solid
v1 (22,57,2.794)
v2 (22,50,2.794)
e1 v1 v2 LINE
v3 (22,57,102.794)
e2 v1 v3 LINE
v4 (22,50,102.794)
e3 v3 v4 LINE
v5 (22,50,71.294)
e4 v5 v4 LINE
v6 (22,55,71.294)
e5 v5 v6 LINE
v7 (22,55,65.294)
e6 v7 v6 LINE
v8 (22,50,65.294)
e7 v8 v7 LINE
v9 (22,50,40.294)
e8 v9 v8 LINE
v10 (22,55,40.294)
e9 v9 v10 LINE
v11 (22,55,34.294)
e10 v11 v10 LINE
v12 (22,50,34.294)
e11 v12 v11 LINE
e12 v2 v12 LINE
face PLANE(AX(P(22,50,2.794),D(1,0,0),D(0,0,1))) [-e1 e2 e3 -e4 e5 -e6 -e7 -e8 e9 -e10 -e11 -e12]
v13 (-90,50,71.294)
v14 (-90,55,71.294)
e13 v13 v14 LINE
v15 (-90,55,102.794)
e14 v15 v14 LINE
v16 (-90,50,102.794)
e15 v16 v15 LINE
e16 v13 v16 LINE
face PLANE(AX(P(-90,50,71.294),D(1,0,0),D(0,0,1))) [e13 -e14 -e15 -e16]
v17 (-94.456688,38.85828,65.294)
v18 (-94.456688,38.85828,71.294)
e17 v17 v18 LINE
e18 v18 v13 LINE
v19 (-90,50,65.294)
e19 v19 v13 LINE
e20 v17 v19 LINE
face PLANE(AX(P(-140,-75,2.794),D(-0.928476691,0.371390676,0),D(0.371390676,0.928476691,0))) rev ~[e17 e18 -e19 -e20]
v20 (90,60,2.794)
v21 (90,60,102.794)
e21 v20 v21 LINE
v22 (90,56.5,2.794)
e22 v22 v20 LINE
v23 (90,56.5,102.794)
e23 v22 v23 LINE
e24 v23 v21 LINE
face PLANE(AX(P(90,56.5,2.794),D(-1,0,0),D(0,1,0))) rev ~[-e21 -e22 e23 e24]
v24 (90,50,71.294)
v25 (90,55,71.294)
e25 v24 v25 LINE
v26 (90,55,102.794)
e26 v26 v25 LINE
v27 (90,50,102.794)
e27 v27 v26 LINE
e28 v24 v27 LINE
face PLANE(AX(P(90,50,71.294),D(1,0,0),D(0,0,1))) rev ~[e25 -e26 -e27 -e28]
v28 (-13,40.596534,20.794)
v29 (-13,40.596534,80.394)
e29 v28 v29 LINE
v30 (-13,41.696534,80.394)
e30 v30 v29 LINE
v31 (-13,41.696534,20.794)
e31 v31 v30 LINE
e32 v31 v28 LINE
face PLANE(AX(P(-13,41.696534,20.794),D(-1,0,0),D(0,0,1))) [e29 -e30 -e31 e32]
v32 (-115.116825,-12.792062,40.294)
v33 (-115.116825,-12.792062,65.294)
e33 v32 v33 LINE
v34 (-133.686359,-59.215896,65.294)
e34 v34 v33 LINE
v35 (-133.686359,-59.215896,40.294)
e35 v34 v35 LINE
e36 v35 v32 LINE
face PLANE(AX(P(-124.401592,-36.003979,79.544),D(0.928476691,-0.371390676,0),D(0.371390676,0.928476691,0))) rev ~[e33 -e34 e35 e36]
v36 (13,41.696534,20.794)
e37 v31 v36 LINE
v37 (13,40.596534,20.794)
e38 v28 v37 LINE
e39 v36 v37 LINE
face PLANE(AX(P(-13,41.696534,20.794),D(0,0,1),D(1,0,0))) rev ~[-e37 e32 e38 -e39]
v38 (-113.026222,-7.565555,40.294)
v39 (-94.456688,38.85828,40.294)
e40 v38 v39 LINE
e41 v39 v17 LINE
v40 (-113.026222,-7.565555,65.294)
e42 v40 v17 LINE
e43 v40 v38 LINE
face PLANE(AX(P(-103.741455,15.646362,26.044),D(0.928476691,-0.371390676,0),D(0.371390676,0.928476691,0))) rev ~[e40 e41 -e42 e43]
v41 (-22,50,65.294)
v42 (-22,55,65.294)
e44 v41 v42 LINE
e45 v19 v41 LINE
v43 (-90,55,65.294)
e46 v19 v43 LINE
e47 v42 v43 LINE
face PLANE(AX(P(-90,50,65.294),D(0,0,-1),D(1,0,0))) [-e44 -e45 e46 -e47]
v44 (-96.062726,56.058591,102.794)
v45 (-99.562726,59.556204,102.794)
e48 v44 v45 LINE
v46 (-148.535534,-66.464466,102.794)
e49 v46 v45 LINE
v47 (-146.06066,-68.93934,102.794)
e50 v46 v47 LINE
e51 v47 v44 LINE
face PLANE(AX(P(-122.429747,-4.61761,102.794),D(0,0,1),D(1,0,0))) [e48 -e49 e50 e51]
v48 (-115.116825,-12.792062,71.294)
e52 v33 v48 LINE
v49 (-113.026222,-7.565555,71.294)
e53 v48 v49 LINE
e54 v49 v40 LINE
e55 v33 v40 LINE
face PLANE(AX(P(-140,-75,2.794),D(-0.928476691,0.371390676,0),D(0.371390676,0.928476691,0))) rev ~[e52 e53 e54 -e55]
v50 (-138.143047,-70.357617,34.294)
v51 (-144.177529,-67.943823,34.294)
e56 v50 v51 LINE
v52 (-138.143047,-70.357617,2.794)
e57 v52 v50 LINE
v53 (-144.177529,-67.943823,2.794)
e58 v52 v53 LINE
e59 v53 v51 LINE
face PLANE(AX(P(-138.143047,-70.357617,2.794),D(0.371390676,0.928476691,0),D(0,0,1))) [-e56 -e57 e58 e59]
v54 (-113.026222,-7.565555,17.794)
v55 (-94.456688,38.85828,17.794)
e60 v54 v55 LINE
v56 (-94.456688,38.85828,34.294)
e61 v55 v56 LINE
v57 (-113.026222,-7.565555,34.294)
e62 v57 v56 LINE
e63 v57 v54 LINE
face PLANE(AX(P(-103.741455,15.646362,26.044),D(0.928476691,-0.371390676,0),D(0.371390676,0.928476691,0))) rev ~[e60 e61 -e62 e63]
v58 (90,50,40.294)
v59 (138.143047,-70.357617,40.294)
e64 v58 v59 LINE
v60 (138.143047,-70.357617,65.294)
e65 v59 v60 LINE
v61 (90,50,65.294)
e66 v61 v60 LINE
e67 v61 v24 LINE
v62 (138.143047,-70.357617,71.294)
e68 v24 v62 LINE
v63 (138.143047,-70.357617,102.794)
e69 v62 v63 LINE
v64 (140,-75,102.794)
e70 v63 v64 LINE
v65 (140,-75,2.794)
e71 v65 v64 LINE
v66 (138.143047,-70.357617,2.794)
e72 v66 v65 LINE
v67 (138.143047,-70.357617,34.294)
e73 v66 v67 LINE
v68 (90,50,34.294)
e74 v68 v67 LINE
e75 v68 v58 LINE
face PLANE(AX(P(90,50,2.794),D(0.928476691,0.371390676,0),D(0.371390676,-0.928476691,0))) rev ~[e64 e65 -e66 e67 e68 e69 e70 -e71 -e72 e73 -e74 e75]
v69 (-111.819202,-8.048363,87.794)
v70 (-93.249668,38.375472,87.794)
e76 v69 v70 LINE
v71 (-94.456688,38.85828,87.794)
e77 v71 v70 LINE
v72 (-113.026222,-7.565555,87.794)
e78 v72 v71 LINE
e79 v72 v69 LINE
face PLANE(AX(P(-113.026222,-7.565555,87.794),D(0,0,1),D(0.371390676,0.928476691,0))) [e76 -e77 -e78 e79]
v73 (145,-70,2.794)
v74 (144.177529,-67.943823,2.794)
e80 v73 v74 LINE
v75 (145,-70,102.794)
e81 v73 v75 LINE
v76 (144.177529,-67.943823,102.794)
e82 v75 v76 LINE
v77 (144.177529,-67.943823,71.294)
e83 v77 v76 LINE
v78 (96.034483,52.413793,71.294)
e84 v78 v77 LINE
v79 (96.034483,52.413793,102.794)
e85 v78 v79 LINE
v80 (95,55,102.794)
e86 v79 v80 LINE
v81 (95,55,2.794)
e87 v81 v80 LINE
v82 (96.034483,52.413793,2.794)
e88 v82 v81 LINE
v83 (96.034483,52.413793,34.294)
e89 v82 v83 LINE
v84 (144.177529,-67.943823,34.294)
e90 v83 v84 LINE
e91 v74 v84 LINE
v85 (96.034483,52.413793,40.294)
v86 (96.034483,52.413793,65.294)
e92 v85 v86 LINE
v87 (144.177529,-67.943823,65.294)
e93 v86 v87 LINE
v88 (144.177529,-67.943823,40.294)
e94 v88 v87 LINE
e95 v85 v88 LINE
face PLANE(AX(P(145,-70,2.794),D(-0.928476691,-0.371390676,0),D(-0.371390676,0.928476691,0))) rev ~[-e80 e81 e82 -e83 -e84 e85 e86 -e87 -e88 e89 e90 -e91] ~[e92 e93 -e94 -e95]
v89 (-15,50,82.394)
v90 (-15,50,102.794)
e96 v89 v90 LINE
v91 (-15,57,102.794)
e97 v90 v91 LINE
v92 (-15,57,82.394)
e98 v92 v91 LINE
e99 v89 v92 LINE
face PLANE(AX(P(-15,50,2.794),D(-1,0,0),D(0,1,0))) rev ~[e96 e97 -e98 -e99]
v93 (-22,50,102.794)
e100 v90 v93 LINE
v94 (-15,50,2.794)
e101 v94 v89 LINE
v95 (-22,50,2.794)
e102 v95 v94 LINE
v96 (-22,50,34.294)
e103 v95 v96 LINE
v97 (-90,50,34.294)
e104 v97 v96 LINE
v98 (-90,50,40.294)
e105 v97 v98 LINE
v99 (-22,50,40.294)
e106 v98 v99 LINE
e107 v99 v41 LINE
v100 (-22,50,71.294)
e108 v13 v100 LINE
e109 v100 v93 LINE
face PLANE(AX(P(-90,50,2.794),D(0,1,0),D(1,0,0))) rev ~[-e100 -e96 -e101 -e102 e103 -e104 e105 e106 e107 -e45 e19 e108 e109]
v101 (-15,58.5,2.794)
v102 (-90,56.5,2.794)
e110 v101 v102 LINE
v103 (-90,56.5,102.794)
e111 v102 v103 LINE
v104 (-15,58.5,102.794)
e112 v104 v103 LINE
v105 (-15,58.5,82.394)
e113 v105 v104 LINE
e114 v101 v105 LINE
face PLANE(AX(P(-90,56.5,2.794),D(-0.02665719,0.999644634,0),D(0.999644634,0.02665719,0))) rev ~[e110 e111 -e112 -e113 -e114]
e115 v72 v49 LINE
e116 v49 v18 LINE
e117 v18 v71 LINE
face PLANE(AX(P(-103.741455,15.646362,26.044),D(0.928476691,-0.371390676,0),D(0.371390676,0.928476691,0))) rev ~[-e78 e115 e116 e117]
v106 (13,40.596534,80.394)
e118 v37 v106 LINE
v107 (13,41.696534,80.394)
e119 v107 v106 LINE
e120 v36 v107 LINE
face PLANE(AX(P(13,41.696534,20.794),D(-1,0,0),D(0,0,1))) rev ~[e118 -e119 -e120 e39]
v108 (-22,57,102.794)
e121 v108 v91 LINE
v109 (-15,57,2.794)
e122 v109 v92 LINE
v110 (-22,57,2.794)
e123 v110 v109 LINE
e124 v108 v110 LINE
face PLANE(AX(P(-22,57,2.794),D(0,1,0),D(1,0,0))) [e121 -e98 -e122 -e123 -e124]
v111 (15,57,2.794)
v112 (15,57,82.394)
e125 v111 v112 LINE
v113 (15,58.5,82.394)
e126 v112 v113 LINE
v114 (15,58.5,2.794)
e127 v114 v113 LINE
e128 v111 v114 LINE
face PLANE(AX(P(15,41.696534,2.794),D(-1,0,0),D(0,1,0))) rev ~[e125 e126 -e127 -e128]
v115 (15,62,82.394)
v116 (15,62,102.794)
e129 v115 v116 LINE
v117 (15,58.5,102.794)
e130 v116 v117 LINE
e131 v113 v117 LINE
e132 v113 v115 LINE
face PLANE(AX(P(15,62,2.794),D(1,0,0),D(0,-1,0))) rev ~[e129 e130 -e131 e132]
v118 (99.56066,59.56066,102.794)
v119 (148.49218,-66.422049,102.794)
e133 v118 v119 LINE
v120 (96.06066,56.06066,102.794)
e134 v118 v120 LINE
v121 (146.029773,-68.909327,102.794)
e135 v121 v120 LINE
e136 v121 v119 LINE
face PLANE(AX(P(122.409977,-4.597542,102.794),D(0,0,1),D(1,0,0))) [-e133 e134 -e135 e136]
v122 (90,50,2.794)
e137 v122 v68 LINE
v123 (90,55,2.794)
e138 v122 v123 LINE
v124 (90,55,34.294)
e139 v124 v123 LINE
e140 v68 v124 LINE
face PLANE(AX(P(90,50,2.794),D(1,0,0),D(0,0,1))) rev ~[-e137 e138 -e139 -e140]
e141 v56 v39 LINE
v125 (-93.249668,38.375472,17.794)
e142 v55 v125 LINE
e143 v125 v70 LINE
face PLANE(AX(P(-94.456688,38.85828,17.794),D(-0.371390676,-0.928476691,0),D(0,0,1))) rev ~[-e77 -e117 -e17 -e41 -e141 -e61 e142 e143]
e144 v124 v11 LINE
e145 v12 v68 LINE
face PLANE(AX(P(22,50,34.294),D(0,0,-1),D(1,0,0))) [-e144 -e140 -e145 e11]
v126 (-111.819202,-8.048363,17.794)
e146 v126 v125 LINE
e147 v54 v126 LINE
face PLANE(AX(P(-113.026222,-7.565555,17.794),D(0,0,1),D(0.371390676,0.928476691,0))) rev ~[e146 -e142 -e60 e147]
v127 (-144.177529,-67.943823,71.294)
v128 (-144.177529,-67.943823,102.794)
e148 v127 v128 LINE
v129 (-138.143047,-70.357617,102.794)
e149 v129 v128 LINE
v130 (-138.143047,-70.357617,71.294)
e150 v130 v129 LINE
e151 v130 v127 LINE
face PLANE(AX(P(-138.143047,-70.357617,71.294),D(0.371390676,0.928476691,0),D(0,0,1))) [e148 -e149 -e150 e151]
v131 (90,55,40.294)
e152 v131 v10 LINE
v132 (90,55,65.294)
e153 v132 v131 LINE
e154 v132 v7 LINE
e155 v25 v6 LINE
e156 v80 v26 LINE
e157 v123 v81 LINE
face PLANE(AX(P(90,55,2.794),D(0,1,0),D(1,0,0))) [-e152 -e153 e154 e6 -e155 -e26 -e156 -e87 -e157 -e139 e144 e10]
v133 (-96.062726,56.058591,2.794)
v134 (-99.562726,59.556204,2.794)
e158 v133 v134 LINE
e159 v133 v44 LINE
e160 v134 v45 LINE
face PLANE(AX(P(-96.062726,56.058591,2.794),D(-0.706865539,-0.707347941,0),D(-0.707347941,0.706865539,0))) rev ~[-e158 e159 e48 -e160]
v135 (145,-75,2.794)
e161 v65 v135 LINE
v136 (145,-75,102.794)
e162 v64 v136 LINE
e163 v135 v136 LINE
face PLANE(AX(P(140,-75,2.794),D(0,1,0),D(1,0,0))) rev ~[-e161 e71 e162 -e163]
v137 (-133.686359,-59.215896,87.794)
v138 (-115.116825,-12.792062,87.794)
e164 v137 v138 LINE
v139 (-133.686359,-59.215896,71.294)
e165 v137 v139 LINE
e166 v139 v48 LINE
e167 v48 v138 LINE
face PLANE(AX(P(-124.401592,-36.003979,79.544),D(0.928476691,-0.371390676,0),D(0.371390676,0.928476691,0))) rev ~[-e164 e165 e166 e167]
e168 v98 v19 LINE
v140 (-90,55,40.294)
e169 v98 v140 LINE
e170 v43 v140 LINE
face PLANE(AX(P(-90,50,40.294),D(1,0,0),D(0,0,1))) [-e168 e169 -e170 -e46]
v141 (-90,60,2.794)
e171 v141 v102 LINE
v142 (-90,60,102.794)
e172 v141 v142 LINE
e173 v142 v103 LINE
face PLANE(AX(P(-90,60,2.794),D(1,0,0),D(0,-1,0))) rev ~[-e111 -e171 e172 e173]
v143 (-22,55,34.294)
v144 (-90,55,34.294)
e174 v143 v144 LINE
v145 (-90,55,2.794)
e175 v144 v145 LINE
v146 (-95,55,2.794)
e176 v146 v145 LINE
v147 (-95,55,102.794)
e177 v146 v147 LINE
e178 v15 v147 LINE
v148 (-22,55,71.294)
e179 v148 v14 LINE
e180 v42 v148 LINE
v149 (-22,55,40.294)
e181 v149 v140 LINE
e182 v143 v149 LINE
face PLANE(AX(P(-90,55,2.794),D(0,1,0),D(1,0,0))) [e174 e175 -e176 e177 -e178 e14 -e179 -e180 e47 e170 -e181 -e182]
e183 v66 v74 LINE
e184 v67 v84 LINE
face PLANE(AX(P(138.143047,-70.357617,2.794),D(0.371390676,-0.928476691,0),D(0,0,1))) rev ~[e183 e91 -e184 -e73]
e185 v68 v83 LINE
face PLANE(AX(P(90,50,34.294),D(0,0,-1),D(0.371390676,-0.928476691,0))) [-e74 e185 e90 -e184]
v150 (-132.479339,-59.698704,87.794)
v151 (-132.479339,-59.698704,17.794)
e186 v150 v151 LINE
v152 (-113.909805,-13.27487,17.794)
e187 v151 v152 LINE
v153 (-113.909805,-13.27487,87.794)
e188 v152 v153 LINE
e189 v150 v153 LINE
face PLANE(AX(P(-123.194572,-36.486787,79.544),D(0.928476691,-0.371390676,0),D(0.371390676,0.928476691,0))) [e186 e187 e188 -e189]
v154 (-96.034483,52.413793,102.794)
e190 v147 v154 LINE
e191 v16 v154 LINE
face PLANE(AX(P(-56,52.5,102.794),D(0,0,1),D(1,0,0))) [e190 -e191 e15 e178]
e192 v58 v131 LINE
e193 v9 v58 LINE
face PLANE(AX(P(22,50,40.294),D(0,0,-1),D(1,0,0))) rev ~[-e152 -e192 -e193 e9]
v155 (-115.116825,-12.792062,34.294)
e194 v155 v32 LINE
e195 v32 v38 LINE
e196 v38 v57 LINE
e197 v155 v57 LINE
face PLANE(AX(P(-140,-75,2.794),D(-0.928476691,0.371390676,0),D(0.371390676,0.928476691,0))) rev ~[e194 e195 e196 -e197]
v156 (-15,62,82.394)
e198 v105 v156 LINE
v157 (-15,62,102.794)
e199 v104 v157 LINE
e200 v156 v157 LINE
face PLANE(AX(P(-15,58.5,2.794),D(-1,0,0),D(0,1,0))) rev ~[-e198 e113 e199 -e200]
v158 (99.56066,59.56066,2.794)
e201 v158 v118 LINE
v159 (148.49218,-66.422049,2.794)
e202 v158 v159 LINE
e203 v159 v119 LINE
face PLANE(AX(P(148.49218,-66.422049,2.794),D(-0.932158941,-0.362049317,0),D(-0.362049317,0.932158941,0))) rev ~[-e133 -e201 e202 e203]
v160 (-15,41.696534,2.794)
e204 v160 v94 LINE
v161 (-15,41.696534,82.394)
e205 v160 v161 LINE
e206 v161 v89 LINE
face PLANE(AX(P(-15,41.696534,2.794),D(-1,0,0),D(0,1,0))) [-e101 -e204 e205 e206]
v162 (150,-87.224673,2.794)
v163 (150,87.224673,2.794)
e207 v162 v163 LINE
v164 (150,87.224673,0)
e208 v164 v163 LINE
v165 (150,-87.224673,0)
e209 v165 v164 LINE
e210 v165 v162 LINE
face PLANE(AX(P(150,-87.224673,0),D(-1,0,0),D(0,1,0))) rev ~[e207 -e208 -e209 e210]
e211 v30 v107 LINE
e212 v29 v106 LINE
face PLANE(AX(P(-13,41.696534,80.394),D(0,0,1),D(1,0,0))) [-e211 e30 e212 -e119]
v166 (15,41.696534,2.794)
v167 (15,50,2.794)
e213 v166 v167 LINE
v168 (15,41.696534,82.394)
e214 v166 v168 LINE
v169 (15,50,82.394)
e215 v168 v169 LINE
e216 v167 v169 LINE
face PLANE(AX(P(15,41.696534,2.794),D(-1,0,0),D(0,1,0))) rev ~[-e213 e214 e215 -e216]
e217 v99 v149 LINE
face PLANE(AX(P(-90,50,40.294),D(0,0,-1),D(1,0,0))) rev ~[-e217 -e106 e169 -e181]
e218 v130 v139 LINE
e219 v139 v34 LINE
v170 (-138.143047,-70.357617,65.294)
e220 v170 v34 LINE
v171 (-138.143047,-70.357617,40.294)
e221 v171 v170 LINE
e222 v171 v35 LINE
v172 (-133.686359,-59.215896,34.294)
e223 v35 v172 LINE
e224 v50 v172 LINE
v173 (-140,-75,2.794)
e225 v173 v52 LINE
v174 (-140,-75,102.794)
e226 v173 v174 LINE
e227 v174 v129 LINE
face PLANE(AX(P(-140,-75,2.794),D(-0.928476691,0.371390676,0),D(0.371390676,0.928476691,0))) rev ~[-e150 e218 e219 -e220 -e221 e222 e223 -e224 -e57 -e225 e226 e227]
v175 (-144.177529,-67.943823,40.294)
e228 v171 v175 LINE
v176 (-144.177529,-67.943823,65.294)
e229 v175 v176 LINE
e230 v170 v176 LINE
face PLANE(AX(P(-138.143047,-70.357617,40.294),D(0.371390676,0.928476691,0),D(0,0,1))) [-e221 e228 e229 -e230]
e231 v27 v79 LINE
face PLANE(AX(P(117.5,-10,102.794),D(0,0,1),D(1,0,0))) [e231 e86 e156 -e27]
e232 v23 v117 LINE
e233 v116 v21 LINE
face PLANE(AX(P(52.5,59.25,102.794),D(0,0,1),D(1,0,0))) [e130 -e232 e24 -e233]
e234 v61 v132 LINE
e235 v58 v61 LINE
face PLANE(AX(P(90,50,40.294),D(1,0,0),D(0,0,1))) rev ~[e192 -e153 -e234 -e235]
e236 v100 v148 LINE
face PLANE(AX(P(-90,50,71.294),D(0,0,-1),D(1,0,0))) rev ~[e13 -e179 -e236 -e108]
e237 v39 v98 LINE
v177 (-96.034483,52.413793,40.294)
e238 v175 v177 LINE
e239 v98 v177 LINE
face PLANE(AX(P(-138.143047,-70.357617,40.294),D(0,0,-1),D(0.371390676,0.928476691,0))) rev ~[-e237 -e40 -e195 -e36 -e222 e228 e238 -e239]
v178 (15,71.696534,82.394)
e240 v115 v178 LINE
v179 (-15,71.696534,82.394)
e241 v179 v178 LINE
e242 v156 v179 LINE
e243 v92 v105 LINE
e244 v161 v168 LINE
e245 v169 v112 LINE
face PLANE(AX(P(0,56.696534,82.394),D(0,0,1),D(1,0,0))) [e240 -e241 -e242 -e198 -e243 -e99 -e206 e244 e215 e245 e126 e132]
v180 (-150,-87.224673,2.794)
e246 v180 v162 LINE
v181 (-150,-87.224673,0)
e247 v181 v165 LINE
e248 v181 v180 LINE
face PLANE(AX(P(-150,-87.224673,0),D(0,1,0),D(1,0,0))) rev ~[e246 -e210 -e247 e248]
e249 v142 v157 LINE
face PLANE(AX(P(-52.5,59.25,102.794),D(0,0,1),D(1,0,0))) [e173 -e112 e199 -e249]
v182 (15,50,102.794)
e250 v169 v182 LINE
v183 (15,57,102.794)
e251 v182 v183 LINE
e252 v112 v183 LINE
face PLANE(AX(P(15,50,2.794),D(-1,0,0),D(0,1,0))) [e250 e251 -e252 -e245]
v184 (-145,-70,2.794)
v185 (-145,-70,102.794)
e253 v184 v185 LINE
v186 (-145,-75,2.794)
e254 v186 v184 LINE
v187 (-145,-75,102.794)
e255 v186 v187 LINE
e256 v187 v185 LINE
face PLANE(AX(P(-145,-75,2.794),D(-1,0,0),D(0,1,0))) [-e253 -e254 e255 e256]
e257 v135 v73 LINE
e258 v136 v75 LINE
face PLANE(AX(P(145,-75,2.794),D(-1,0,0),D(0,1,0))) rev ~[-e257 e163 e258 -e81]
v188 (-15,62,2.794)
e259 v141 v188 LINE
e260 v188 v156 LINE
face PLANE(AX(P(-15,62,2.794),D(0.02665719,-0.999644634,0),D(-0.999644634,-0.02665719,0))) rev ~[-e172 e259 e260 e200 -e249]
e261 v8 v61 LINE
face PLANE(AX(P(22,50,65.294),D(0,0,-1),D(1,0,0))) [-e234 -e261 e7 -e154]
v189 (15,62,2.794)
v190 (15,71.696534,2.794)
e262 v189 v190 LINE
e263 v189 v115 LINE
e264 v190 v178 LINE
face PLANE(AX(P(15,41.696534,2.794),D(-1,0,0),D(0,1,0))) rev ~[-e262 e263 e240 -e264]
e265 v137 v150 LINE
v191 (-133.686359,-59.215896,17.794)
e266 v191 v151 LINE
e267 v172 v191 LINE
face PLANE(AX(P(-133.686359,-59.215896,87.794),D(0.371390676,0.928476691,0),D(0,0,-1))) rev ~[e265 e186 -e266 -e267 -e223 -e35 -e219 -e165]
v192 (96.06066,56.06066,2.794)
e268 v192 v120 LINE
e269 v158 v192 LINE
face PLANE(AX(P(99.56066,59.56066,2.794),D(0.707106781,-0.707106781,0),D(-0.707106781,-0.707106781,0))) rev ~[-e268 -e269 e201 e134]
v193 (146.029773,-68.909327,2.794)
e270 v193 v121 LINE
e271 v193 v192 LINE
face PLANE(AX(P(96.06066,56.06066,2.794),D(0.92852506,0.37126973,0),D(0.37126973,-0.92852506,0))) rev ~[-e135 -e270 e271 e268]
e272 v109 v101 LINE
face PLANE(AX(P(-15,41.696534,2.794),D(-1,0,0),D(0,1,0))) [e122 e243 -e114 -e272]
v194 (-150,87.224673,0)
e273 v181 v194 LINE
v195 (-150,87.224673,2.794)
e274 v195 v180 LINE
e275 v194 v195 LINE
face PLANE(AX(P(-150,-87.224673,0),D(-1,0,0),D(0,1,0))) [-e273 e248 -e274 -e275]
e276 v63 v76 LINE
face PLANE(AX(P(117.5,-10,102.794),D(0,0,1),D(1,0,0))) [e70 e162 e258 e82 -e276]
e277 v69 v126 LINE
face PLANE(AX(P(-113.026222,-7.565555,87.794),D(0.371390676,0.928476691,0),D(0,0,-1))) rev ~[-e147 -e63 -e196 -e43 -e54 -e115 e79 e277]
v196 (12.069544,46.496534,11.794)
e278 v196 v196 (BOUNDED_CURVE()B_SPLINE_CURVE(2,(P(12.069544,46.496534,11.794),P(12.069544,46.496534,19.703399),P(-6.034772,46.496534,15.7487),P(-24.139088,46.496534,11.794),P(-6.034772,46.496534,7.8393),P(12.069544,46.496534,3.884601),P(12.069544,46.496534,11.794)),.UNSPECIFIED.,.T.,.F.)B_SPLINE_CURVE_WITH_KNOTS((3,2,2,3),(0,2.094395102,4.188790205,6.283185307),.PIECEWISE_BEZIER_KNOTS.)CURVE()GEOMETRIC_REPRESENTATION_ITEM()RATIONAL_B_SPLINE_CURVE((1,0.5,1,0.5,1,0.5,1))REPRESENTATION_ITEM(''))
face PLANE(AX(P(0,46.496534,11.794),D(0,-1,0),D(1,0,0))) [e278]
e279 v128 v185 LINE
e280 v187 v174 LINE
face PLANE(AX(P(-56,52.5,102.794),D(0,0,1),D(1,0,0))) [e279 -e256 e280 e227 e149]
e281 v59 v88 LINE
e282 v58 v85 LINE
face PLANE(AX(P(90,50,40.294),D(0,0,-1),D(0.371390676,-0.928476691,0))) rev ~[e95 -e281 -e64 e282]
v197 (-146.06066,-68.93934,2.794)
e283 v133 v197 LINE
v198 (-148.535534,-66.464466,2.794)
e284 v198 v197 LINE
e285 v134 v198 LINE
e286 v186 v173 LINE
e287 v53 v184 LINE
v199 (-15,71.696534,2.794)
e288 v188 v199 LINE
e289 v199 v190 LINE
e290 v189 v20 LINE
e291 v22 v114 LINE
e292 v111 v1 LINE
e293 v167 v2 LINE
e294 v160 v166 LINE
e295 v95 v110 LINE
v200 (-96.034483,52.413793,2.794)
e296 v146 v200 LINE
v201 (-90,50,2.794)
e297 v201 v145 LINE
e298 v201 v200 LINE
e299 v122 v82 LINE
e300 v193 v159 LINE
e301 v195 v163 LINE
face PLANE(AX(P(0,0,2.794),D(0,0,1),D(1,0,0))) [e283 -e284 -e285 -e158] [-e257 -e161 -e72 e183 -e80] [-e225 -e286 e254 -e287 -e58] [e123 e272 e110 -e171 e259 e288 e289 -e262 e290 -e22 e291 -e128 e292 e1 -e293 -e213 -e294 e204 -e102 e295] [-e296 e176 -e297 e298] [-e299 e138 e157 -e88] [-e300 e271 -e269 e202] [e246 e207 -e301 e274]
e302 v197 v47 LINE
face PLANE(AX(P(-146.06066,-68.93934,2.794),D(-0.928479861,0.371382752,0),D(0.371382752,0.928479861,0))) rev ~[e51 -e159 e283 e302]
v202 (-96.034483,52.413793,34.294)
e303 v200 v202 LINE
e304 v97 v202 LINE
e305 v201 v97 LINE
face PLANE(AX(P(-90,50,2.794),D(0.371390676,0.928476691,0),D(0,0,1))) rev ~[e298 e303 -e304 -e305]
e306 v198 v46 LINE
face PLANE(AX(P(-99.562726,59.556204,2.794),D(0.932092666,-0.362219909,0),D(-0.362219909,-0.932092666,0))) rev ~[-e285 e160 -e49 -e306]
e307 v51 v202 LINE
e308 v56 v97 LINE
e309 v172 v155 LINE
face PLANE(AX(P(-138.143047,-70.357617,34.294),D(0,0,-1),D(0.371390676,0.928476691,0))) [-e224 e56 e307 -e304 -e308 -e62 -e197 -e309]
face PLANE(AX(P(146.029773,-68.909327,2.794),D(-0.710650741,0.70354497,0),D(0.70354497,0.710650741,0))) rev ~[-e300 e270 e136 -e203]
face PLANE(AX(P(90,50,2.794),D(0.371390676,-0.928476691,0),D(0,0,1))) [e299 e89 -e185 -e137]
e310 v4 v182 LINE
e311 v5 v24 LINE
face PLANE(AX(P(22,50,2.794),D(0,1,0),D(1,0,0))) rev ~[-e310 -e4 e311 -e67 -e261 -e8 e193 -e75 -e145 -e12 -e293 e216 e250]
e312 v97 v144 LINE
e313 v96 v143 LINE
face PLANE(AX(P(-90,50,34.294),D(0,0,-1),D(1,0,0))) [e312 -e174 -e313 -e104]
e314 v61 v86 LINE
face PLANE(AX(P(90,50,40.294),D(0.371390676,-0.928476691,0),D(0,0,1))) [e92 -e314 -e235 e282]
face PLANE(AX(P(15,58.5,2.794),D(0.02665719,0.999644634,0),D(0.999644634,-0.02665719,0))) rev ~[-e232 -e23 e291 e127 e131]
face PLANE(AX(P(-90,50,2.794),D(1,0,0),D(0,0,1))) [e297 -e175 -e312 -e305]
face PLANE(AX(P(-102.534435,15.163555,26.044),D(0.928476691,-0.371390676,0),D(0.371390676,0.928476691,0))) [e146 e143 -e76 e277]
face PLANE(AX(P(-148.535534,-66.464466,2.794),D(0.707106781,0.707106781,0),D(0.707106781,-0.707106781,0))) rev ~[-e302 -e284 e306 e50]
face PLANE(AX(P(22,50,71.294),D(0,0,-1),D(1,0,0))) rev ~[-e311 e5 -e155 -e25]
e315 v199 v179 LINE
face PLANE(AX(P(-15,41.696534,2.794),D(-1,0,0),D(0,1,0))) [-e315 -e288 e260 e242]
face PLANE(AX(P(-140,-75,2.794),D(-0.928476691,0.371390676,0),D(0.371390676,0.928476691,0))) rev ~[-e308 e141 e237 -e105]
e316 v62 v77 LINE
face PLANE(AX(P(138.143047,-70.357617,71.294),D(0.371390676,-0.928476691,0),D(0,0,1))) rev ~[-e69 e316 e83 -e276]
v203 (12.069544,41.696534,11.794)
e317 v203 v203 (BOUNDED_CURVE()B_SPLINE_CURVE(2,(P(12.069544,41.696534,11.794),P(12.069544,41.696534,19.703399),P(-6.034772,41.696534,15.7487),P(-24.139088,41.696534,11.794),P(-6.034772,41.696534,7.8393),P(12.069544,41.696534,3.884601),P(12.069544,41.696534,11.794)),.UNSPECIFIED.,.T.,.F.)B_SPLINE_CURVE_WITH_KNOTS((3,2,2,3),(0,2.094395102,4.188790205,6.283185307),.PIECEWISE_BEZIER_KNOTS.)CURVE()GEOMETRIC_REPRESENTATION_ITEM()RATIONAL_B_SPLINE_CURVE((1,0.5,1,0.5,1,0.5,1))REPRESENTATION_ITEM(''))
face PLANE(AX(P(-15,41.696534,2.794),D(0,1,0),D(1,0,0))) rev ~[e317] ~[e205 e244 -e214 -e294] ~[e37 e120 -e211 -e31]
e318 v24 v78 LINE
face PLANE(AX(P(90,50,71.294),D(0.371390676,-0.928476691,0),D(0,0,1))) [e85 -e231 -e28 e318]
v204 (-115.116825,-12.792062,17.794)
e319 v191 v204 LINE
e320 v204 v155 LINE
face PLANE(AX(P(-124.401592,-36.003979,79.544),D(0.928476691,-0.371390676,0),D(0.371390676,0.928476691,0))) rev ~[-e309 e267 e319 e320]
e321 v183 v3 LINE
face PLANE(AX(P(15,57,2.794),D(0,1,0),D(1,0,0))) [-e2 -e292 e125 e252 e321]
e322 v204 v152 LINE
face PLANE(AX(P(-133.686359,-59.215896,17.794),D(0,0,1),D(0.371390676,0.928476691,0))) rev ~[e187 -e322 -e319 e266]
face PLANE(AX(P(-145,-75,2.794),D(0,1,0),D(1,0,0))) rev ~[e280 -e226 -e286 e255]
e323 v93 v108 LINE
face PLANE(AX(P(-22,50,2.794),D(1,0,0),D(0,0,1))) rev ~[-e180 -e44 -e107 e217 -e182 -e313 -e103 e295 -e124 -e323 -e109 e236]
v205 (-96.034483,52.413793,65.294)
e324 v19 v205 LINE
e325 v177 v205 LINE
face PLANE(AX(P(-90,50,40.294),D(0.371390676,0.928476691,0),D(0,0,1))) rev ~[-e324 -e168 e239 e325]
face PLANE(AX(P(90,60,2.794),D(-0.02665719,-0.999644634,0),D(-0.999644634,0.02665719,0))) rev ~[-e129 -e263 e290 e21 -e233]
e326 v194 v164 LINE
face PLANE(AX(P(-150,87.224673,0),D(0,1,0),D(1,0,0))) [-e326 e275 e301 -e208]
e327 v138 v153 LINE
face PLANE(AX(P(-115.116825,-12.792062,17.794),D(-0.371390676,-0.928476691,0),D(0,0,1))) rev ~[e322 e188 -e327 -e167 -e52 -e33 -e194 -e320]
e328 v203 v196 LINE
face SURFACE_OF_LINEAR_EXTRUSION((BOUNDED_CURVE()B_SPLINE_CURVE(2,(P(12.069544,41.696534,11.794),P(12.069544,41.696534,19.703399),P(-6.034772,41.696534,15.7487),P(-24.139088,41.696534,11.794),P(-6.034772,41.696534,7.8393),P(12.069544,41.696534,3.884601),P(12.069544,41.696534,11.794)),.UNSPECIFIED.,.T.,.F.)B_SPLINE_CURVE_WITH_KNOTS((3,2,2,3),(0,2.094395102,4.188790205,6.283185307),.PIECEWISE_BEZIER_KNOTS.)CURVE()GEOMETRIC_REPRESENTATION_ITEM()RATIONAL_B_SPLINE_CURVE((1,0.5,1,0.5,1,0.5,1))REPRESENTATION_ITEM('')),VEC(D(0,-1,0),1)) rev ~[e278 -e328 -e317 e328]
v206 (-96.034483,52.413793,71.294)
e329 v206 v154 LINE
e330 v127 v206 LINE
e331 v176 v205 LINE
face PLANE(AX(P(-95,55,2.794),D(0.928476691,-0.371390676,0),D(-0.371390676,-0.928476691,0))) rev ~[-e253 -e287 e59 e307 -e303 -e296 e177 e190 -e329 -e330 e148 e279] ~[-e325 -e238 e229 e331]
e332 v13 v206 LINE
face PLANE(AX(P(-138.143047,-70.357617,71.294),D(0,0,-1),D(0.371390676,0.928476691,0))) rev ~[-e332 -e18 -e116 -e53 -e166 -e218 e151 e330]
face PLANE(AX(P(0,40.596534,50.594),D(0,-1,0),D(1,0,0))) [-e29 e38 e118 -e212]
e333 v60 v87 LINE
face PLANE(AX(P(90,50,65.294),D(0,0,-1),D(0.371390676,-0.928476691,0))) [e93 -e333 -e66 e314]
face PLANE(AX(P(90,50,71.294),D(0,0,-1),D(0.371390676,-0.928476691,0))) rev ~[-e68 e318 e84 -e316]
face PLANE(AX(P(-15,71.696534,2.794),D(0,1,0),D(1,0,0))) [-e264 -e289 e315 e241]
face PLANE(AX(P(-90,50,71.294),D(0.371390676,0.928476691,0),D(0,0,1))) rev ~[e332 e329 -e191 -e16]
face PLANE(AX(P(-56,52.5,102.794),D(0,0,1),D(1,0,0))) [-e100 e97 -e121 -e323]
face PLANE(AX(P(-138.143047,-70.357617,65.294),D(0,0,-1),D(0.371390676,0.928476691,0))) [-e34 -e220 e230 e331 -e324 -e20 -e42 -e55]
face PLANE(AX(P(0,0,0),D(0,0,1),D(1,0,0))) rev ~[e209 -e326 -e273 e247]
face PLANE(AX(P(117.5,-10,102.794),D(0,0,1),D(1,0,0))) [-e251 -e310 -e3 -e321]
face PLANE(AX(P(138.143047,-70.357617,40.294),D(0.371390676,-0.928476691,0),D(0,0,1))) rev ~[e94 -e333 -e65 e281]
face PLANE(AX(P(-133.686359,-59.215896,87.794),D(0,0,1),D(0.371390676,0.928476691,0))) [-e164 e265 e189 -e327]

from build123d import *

# Parameters (mm, degrees)
F0_W      = 300
F0_H      = 174.4493450305
F1_DEPTH  = 2.794
F2_W      = 5
F2_H      = 5
F2_W_2    = 7
F2_H_2    = 7
F3_DEPTH  = 100
F4_W      = 30
F4_H      = 30
F5_DEPTH  = 79.6
F6_W      = 26
F6_H      = 59.6
F7_DEPTH  = 1.1
F9_DEPTH  = 4.8
F11_DEPTH = 100
F12_W     = 68
F12_H     = 5
F13_DEPTH = 100
F14_W     = 68
F14_H     = 5
F15_DEPTH = 100
F17_DEPTH = 100
F18_W     = 129.6291201784
F18_H     = 31.5
F18_H_2   = 25
F19_DEPTH = 16.5
F20_W     = 68
F20_H     = 31.5
F20_H_2   = 25
F21_DEPTH = 25
F22_W     = 68
F22_H     = 31.5
F22_H_2   = 25
F23_DEPTH = 25
F24_W     = 129.6291201784
F24_H     = 31.5
F24_H_2   = 25
F25_DEPTH = 25
F26_DEPTH = 100
F27_W     = 50
F27_H     = 16.5
F27_H_2   = 25
F27_H_3   = 6
F28_DEPTH = 1.3


with BuildPart() as f1:
    # F0 (on Top) → F1 (new body)
    with BuildSketch(Plane.XY):
        Rectangle(F0_W, F0_H)
    extrude(amount=F1_DEPTH)

    # F2 (on face) → F3 (join)
    with BuildSketch(Plane.XY.offset(2.794)):
        with Locations((-142.5, -72.5)):
            Rectangle(F2_W, F2_H)
        with Locations((-92.5, 52.5)):
            Rectangle(F2_W, F2_H)
        with Locations((92.5, 52.5)):
            Rectangle(F2_W, F2_H)
        with Locations((142.5, -72.5)):
            Rectangle(F2_W, F2_H)
        with Locations((-18.5, 53.5)):
            Rectangle(F2_W_2, F2_H_2)
        with Locations((18.5, 53.5)):
            Rectangle(F2_W_2, F2_H_2)
        Polygon((-90, 60), (-90, 56.5), (-15, 58.5), (-15, 62), align=None)
        Polygon((90, 60), (15, 62), (15, 58.5), (90, 56.5), align=None)
        Polygon((96.0606601718, 56.0606601718), (146.02977278, -68.9093268035), (148.4921801752, -66.4220492114), (99.5606601718, 59.5606601718), align=None)
        Polygon((-96.0627255066, 56.0585908075), (-99.5627255066, 59.5562038535), (-148.5355339059, -66.4644660941), (-146.0606601718, -68.9393398282), align=None)
    extrude(amount=F3_DEPTH)

    # F4 (on face) → F5 (join)
    with BuildSketch(Plane.XY.offset(2.794)):
        with Locations((0, 56.6965335608)):
            Rectangle(F4_W, F4_H)
    extrude(amount=F5_DEPTH)

    # F6 (on face) → F7 (join)
    with BuildSketch(Plane.XZ.offset(-41.6965335608)):
        with Locations((0, 50.594)):
            Rectangle(F6_W, F6_H)
    extrude(amount=F7_DEPTH)

    # F8 (on face) → F9 (cut)
    with BuildSketch(Plane.XZ.offset(-41.6965335608)):
        with BuildLine():
            add(Edge.make_bspline(
                [(12.06954394, 11.794), (12.06954394, 19.7033991149), (-6.03477197, 15.7486995575), (-24.13908788, 11.794), (-6.03477197, 7.8393004425), (12.06954394, 3.8846008851), (12.06954394, 11.794)],
                knots=[0, 0, 0, 2.0943951024, 2.0943951024, 4.1887902048, 4.1887902048, 6.2831853072, 6.2831853072, 6.2831853072], degree=2, weights=[1, 0.5, 1, 0.5, 1, 0.5, 1]))
        make_face()
    extrude(amount=-F9_DEPTH, mode=Mode.SUBTRACT)

    # F10 (on face) → F11 (join)
    with BuildSketch(Plane.XY.offset(2.794)):
        Polygon((-140, -70), (-140, -75), (-90, 50), (-95, 50), (-95, 55), (-145, -70), align=None)
    extrude(amount=F11_DEPTH)

    # F12 (on face) → F13 (join)
    with BuildSketch(Plane.XY.offset(2.794)):
        with Locations((-56, 52.5)):
            Rectangle(F12_W, F12_H)
    extrude(amount=F13_DEPTH)

    # F14 (on face) → F15 (join)
    with BuildSketch(Plane.XY.offset(2.794)):
        with Locations((56, 52.5)):
            Rectangle(F14_W, F14_H)
    extrude(amount=F15_DEPTH)

    # F16 (on face) → F17 (join)
    with BuildSketch(Plane.XY.offset(2.794)):
        Polygon((90, 50), (140, -75), (140, -70), (145, -70), (95, 55), (95, 50), align=None)
    extrude(amount=F17_DEPTH)

    # F18 (on face) → F19 (cut)
    with BuildSketch(Plane(origin=(-94.8275862069, 37.9310344828, 0), x_dir=(0.3713906764, 0.9284766909, 0), z_dir=(0.9284766909, -0.3713906764, 0))):
        with Locations((-51.8158864168, 87.044)):
            Rectangle(F18_W, F18_H)
        with Locations((-51.8158864168, 52.794)):
            Rectangle(F18_W, F18_H_2)
        with Locations((-51.8158864168, 18.544)):
            Rectangle(F18_W, F18_H)
    extrude(amount=-F19_DEPTH, mode=Mode.SUBTRACT)

    # F20 (on face) → F21 (cut)
    with BuildSketch(Plane.XZ.offset(-50)):
        with Locations((-56, 87.044)):
            Rectangle(F20_W, F20_H)
        with Locations((-56, 52.794)):
            Rectangle(F20_W, F20_H_2)
        with Locations((-56, 18.544)):
            Rectangle(F20_W, F20_H)
    extrude(amount=-F21_DEPTH, mode=Mode.SUBTRACT)

    # F22 (on face) → F23 (cut)
    with BuildSketch(Plane.XZ.offset(-50)):
        with Locations((56, 18.544)):
            Rectangle(F22_W, F22_H)
        with Locations((56, 52.794)):
            Rectangle(F22_W, F22_H_2)
        with Locations((56, 87.044)):
            Rectangle(F22_W, F22_H)
    extrude(amount=-F23_DEPTH, mode=Mode.SUBTRACT)

    # F24 (on face) → F25 (cut)
    with BuildSketch(Plane(origin=(94.8275862069, 37.9310344828, 0), x_dir=(0.3713906764, -0.9284766909, 0), z_dir=(-0.9284766909, -0.3713906764, 0))):
        with Locations((51.8158864168, 87.044)):
            Rectangle(F24_W, F24_H)
        with Locations((51.8158864168, 52.794)):
            Rectangle(F24_W, F24_H_2)
        with Locations((51.8158864168, 18.544)):
            Rectangle(F24_W, F24_H)
    extrude(amount=-F25_DEPTH, mode=Mode.SUBTRACT)

    # F2 (on face) → F26 (join)
    with BuildSketch(Plane.XY.offset(2.794)):
        Polygon((-96.0627255066, 56.0585908075), (-99.5627255066, 59.5562038535), (-148.5355339059, -66.4644660941), (-146.0606601718, -68.9393398282), align=None)
        Polygon((-90, 60), (-90, 56.5), (-15, 58.5), (-15, 62), align=None)
        Polygon((90, 60), (15, 62), (15, 58.5), (90, 56.5), align=None)
        Polygon((96.0606601718, 56.0606601718), (146.02977278, -68.9093268035), (148.4921801752, -66.4220492114), (99.5606601718, 59.5606601718), align=None)
    extrude(amount=F26_DEPTH)

    # F27 (on face) → F28 (join)
    with BuildSketch(Plane(origin=(-94.8275862069, 37.9310344828, 0), x_dir=(0.3713906764, 0.9284766909, 0), z_dir=(0.9284766909, -0.3713906764, 0))):
        with Locations((-79.630446506, 79.544)):
            Rectangle(F27_W, F27_H)
        with Locations((-79.630446506, 52.794)):
            Rectangle(F27_W, F27_H_2)
        with Locations((-79.630446506, 68.294)):
            Rectangle(F27_W, F27_H_3)
        with Locations((-79.630446506, 26.044)):
            Rectangle(F27_W, F27_H)
        with Locations((-79.630446506, 37.294)):
            Rectangle(F27_W, F27_H_3)
        with Locations((-24.0013263276, 26.044)):
            Rectangle(F27_W, F27_H)
        with Locations((-24.0013263276, 37.294)):
            Rectangle(F27_W, F27_H_3)
        with Locations((-24.0013263276, 52.794)):
            Rectangle(F27_W, F27_H_2)
        with Locations((-24.0013263276, 68.294)):
            Rectangle(F27_W, F27_H_3)
        with Locations((-24.0013263276, 79.544)):
            Rectangle(F27_W, F27_H)
    extrude(amount=F28_DEPTH)


solid = f1.part
